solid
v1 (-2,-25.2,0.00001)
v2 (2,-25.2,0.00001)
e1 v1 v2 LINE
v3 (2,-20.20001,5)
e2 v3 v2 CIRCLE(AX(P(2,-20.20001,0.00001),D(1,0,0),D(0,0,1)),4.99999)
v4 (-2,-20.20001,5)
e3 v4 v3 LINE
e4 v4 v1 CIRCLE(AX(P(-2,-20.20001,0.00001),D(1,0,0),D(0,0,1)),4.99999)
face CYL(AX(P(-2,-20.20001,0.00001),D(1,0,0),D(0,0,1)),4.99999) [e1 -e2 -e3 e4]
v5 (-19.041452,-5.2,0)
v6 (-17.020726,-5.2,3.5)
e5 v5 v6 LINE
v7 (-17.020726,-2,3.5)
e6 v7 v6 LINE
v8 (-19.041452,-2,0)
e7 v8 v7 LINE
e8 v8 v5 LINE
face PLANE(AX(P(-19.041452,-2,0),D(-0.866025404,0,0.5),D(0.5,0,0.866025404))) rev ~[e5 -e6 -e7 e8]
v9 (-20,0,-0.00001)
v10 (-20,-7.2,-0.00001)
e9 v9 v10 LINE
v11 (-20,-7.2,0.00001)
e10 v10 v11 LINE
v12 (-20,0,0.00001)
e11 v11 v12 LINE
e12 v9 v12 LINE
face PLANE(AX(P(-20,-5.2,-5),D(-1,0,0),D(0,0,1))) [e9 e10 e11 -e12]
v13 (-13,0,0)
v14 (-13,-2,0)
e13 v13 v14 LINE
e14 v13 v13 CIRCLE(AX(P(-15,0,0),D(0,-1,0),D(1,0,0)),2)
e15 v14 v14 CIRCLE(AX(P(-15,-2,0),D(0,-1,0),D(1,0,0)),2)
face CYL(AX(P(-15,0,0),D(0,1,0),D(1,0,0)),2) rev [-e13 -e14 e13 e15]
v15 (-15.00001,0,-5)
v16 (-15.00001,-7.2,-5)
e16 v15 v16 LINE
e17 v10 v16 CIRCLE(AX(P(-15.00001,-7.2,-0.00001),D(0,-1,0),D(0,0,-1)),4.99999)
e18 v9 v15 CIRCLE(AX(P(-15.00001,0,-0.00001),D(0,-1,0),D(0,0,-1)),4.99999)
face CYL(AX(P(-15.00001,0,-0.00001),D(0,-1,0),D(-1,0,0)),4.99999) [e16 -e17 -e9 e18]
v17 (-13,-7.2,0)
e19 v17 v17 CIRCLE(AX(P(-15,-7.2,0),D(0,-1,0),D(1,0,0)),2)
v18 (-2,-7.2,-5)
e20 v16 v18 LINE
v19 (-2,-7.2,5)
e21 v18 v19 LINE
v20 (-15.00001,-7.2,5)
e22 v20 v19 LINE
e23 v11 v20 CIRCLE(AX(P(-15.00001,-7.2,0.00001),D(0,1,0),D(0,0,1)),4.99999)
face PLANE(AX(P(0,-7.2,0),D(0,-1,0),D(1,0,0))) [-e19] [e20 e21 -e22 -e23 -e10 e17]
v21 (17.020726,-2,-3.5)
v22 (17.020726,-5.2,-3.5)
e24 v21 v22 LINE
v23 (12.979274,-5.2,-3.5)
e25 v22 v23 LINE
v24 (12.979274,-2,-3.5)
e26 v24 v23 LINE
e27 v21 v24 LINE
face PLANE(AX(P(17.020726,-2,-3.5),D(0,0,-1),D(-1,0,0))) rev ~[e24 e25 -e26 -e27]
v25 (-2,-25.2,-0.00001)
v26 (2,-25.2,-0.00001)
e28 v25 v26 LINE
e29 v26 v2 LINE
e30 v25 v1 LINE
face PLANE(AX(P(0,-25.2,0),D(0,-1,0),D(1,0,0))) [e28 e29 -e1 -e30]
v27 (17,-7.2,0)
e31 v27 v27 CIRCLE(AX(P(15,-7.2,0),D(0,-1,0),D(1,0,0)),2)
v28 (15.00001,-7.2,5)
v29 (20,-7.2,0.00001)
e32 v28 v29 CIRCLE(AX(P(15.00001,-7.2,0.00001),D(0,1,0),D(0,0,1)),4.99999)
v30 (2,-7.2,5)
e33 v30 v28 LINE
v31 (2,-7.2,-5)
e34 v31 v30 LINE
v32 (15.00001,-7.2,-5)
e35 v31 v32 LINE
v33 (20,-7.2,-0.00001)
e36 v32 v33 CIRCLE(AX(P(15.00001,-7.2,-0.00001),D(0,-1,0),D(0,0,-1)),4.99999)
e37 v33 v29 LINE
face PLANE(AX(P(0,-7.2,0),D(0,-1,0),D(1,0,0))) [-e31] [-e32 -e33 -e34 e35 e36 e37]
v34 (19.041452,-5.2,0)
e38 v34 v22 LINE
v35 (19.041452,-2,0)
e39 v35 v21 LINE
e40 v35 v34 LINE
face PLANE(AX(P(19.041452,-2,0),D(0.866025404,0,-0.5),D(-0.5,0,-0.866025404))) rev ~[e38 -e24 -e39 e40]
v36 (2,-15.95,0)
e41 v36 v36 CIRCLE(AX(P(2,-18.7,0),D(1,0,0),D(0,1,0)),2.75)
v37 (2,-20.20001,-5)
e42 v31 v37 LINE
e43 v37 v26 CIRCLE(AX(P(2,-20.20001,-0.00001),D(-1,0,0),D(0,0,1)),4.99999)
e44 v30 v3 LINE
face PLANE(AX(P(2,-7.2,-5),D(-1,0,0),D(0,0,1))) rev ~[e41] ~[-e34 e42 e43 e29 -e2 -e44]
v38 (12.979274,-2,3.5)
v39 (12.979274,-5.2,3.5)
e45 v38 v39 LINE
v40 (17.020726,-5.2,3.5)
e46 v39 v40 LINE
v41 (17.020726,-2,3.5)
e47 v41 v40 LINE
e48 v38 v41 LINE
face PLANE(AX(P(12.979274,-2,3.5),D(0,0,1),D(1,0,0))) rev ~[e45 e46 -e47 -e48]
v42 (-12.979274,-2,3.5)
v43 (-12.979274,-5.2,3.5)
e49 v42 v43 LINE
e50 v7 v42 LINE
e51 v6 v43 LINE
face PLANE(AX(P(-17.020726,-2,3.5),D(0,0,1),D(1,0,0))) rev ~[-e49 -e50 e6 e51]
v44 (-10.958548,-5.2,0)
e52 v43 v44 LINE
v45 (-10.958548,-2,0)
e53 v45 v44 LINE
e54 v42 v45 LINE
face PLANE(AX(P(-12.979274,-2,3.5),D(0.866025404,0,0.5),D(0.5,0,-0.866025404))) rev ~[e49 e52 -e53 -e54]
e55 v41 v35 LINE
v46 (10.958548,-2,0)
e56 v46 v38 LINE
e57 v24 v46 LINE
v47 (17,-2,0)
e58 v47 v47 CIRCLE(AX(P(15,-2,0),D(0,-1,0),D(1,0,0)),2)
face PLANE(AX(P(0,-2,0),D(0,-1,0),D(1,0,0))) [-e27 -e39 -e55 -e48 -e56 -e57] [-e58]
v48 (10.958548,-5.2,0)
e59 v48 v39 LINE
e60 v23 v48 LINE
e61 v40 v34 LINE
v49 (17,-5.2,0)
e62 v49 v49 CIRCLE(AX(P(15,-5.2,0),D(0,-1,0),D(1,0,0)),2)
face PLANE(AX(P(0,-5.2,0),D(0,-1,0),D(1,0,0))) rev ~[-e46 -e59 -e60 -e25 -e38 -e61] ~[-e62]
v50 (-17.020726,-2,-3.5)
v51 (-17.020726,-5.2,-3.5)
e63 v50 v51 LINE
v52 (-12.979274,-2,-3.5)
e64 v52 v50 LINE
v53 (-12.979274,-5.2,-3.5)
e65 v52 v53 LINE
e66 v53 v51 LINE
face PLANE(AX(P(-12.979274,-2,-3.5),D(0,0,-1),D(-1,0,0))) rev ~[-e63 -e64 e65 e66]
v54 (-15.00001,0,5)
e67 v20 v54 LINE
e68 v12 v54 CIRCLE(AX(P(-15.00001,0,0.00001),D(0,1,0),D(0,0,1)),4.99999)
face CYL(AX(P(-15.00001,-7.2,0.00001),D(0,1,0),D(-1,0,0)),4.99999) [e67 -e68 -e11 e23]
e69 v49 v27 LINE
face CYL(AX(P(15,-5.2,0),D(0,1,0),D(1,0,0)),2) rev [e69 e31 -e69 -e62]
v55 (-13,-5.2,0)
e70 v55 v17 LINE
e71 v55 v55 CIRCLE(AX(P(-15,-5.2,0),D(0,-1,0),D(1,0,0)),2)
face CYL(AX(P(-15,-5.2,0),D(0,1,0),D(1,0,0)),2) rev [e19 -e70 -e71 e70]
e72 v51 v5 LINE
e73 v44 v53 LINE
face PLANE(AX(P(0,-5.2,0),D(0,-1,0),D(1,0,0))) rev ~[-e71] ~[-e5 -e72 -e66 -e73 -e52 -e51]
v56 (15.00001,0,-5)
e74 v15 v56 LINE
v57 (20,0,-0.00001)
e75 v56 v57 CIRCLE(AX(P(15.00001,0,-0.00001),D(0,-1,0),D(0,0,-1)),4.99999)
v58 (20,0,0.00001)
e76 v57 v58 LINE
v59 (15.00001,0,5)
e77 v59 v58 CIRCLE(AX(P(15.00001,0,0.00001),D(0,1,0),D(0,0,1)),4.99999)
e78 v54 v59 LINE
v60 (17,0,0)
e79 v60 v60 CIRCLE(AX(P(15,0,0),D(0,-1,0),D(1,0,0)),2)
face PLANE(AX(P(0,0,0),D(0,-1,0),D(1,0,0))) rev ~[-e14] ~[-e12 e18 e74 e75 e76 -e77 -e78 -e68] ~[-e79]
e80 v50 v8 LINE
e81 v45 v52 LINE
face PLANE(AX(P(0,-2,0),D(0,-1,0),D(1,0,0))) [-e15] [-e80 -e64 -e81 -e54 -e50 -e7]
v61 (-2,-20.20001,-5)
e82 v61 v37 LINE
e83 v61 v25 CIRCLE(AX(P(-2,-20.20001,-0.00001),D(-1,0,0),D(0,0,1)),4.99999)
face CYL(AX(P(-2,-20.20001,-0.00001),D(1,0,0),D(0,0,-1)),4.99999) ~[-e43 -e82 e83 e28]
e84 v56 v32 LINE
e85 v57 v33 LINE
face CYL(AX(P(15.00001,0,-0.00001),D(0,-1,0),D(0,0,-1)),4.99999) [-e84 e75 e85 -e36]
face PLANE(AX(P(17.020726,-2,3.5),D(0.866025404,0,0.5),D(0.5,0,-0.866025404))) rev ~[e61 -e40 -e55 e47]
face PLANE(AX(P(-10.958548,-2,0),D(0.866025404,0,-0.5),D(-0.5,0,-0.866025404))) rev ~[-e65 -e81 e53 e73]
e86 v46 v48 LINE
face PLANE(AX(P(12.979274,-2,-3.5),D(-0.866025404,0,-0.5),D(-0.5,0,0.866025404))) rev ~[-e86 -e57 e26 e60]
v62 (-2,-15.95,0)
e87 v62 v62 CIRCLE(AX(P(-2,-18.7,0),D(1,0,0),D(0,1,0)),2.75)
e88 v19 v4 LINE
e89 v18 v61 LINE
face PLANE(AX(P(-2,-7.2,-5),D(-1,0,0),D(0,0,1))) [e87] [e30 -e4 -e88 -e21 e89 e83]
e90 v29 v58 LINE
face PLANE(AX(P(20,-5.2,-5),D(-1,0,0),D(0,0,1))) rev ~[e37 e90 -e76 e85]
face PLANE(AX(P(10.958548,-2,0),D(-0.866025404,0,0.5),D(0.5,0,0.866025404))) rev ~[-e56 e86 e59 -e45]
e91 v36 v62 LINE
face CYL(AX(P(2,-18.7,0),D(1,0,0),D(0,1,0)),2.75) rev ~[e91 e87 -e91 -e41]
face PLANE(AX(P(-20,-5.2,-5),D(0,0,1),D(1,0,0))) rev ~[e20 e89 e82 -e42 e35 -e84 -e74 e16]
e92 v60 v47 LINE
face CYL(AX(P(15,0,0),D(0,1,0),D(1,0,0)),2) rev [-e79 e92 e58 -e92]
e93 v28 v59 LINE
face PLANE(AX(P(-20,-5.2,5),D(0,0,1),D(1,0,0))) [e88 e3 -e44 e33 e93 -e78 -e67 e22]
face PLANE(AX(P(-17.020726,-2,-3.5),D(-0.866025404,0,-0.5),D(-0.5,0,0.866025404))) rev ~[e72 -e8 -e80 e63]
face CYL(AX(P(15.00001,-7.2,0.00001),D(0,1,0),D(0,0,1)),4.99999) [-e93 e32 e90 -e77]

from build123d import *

# Parameters (mm, degrees)
F0_W     = 40
F0_H     = 10
F0_R     = 2
F1_DEPTH = 2
F2_W     = 40
F2_H     = 10
F3_DEPTH = 3.2
F4_START = 5.2
F4_DEPTH = 2
F5_W     = 4
F5_H     = 10
F6_DEPTH = 18
F7_R     = 2.75
F8_DEPTH = 25
F9_R     = 4.99999


# Not quite as in the source:
# - a fillet or chamfer is up to 0.001 mm smaller than in the source, because OpenCascade refuses the exact size


with BuildPart() as f1:
    # F0 (on Front) → F1 (new body)
    with BuildSketch(Plane.XZ):
        Rectangle(F0_W, F0_H)
        with Locations((-15, 0)):
            Circle(F0_R, mode=Mode.SUBTRACT)
        with Locations((15, 0)):
            Circle(F0_R, mode=Mode.SUBTRACT)
    extrude(amount=F1_DEPTH)

    # F2 (on face) → F3 (join)
    with BuildSketch(Plane.XZ.offset(2)):
        Rectangle(F2_W, F2_H)
        Polygon((-10.9585481157, 0), (-12.9792740578, -3.5), (-17.0207259422, -3.5), (-19.0414518843, 0), (-17.0207259422, 3.5), (-12.9792740578, 3.5), align=None, mode=Mode.SUBTRACT)
        Polygon((19.0414518843, 0), (17.0207259422, -3.5), (12.9792740578, -3.5), (10.9585481157, 0), (12.9792740578, 3.5), (17.0207259422, 3.5), align=None, mode=Mode.SUBTRACT)
    extrude(amount=F3_DEPTH)

    # F0 (on Front) → F4 (join)
    with BuildSketch(Plane.XZ.offset(F4_START)):
        Rectangle(F0_W, F0_H)
        with Locations((-15, 0)):
            Circle(F0_R, mode=Mode.SUBTRACT)
        with Locations((15, 0)):
            Circle(F0_R, mode=Mode.SUBTRACT)
    extrude(amount=F4_DEPTH)

    # F5 (on face) → F6 (join)
    with BuildSketch(Plane.XZ.offset(7.2)):
        Rectangle(F5_W, F5_H)
    extrude(amount=F6_DEPTH)

    # F7 (on face) → F8 (cut)
    with BuildSketch(Plane.YZ.offset(2)):
        with Locations((-18.7, 0)):
            Circle(F7_R)
    extrude(amount=-F8_DEPTH, mode=Mode.SUBTRACT)

    # F9 (radius 5 in the source; OpenCascade refuses exactly that, so slightly less here)
    f9_edges = [f1.edges().sort_by_distance(p)[0] for p in [
        (0, -25.2, 5),
        (0, -25.2, -5),
        (20, -3.6, 5),
        (20, -3.6, -5),
        (-20, -3.6, 5),
        (-20, -3.6, -5),
    ]]
    fillet(f9_edges, radius=F9_R)


solid = f1.part
